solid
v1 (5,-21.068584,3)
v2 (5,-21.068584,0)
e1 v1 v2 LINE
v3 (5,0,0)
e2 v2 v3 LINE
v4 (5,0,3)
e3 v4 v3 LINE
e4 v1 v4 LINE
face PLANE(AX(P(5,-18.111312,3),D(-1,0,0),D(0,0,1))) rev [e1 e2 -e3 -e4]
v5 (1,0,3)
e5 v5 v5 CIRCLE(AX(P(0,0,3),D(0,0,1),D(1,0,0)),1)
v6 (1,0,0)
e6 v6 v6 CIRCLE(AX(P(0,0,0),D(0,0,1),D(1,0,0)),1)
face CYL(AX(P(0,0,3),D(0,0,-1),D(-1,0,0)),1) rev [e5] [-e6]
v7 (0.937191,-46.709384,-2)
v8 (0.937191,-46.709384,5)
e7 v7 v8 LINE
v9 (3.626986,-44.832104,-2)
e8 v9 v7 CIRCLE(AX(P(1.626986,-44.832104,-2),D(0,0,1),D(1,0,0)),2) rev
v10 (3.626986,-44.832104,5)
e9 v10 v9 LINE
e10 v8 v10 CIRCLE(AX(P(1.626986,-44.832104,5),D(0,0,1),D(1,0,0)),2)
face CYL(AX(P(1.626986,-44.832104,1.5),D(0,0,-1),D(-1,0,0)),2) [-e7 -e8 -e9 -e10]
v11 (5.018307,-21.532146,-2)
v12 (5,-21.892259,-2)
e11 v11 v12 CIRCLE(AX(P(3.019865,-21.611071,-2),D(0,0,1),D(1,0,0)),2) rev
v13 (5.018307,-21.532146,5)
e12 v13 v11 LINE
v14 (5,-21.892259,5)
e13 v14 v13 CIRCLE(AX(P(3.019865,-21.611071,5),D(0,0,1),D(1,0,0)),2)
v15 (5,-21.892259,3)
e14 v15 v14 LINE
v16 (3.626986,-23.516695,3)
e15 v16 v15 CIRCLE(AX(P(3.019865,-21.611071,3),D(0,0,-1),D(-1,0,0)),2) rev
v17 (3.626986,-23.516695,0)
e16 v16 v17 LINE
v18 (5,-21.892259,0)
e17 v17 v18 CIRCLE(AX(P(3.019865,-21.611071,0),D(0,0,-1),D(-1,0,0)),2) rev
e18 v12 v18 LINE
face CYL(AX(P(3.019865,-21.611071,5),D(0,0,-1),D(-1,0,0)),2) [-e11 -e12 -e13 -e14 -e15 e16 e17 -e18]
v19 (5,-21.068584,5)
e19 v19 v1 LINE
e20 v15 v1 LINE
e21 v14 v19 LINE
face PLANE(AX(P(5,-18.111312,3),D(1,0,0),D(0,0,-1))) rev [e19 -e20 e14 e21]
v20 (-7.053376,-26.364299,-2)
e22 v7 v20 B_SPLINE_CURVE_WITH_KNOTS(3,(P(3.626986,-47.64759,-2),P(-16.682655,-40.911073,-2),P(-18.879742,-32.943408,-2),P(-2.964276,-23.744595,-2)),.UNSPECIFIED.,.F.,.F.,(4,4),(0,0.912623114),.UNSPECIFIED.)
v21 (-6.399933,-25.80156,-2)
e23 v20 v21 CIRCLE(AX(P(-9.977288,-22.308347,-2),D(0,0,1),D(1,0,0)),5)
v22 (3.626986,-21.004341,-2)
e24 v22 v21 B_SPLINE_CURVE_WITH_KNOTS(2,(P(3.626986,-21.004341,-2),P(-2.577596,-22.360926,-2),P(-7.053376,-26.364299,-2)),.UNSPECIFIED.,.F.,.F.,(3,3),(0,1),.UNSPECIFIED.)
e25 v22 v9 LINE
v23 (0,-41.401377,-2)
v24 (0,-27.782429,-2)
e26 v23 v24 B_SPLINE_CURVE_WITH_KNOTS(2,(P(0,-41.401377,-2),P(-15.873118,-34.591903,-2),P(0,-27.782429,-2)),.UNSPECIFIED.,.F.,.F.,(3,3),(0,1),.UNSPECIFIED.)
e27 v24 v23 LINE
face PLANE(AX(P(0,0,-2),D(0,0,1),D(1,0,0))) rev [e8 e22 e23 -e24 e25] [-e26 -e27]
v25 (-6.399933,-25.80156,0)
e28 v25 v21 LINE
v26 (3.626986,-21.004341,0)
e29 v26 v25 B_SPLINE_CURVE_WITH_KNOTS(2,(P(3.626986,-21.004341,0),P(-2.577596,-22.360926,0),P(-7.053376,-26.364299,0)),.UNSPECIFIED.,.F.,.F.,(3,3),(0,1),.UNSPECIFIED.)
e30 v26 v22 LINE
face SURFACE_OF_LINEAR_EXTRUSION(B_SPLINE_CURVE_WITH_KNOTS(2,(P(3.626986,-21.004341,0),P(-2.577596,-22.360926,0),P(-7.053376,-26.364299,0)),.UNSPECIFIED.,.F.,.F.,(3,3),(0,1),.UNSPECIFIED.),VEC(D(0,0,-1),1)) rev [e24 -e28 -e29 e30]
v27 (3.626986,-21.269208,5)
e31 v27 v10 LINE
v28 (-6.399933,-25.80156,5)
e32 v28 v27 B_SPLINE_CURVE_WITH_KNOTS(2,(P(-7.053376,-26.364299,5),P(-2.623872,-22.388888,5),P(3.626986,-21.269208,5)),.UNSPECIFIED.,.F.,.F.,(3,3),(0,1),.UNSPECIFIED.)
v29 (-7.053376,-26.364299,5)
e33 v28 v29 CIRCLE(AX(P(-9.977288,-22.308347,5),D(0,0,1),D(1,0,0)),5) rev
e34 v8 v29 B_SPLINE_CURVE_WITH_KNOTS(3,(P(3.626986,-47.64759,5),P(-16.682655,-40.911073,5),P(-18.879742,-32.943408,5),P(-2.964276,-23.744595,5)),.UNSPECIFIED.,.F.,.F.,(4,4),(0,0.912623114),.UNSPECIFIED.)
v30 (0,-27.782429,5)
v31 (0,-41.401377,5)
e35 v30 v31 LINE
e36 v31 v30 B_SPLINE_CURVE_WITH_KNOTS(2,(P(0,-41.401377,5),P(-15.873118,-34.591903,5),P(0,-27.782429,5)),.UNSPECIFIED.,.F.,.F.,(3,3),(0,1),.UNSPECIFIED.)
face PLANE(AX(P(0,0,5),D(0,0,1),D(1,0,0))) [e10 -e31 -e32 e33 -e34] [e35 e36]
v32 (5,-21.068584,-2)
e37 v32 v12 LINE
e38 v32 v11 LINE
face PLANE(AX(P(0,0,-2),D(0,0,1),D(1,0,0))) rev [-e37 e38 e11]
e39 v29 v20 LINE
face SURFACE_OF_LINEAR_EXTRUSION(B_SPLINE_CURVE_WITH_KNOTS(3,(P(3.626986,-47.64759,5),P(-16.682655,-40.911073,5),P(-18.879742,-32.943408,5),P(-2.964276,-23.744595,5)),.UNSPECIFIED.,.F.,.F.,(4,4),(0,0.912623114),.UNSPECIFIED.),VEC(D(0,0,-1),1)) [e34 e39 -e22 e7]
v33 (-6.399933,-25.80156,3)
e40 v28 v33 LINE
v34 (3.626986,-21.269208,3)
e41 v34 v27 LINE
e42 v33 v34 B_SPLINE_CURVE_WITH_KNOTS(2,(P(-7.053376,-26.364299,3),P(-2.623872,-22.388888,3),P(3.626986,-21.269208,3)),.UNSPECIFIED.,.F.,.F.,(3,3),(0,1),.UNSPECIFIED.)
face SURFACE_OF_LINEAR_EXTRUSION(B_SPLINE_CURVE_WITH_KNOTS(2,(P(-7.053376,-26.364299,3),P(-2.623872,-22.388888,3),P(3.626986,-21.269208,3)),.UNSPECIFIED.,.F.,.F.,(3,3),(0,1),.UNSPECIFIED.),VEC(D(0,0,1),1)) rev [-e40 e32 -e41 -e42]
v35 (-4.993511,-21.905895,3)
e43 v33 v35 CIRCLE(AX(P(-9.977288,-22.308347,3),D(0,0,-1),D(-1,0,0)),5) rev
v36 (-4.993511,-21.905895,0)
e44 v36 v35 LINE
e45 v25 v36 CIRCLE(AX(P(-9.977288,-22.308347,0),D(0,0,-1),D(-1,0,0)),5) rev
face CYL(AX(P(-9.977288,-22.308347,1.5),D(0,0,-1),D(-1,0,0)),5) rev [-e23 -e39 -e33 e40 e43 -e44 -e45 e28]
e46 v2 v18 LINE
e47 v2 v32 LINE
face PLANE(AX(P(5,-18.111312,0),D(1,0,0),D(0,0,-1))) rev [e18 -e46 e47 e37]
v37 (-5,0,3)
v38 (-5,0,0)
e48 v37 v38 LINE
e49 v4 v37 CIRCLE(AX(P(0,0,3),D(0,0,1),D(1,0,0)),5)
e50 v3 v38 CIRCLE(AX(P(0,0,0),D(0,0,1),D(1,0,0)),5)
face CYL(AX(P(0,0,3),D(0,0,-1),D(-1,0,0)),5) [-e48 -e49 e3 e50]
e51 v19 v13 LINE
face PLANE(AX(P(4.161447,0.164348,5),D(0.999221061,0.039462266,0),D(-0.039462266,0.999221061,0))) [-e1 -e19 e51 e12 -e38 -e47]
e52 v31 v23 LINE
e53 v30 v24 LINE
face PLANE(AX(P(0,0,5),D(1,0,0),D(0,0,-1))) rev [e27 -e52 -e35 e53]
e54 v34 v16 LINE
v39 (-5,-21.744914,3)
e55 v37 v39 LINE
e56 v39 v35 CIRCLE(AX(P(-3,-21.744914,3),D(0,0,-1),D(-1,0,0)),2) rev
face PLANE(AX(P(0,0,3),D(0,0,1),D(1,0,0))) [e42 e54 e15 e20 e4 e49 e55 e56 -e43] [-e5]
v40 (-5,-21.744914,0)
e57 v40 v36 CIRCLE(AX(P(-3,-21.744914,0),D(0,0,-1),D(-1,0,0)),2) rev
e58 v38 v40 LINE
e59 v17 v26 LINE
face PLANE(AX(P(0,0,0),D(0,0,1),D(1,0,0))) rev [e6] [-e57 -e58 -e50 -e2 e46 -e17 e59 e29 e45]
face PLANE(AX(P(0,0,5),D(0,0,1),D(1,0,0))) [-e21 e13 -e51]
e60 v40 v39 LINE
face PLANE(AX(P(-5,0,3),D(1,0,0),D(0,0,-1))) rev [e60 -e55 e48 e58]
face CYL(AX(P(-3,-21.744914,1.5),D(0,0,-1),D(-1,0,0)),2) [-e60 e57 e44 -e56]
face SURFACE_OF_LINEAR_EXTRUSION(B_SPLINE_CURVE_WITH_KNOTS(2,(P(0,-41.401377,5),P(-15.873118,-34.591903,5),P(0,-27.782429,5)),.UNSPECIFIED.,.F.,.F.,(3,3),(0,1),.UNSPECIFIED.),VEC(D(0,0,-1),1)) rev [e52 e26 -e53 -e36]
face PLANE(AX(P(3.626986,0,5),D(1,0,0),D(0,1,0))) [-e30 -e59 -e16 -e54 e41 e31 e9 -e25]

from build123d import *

# Parameters (mm, degrees)
SKETCH_1_R           = 1
EXTRUDE_1_DEPTH      = 3
EXTRUDE_2_DEPTH      = 2
EXTRUDE_2_DEPTH_BACK = 5
FILLET_START         = -3
FILLET_3_DEPTH       = 9
FILLET_4_R           = 5
CUT_EXTRUDE_2_DEPTH  = 2
CUT_EXTRUDE_3_DEPTH  = 2


with BuildPart() as part:
    # 草图1 → 凸台-拉伸1 (new body)
    with BuildSketch(Plane.XY):
        with BuildLine():
            Line((-5, 0), (-5, -18.11131196))
            Line((-5, -18.11131196), (5, -18.11131196))
            Line((5, -18.11131196), (5, 0))
            ThreePointArc((5, 0), (0, 5), (-5, 0))
        make_face()
        Circle(SKETCH_1_R, mode=Mode.SUBTRACT)
    extrude(amount=EXTRUDE_1_DEPTH)

    # 草图2 → 凸台-拉伸2 (add, two sides: drawn at the far end of the back side and taken through both)
    with BuildSketch(Plane.XY.offset(3).offset(-EXTRUDE_2_DEPTH_BACK)):
        with BuildLine():
            Line((5, -21.0685844), (5, -18.11131196))
            Line((5, -18.11131196), (-5, -18.11131196))
            Line((-5, -18.11131196), (-5, -21.0685844))
            Line((-5, -21.0685844), (-5, -23.814982117))
            Line((-5, -23.814982117), (-2.964275547, -23.744594918))
            add(Edge.make_bspline(
                [(3.626985758, -47.647589684), (-16.682654634, -40.9110727), (-18.879741736, -32.943407778), (-2.964275547, -23.744594918)],
                knots=[0, 0, 0, 0, 0.912623114, 0.912623114, 0.912623114, 0.912623114], degree=3))
            Line((3.626985758, -47.647589684), (3.626985758, -23.516695498))
            Line((3.626985758, -23.516695498), (5.09467917, -23.465948537))
            Line((5.09467917, -23.465948537), (5, -21.0685844))
        make_face()
        with BuildLine():
            add(Edge.make_bspline(
                [(0, -41.401376639), (-15.873118036, -34.591902926), (0, -27.782429212)],
                knots=[0, 0, 0, 1, 1, 1], degree=2))
            Line((0, -27.782429212), (0, -41.401376639))
        make_face(mode=Mode.SUBTRACT)
    extrude(amount=EXTRUDE_2_DEPTH + EXTRUDE_2_DEPTH_BACK)

    # 圆角3: read off the stored shape, not the designer's step
    # 圆角3 outline → 圆角3 (cut)
    with BuildSketch(Plane.XY.offset(FILLET_START)):
        with BuildLine():
            Line((5.09467917, -23.465948537), (5.018307469, -21.532146448))
            ThreePointArc((5.018307469, -21.532146448), (4.657500154, -22.759179091), (3.626985758, -23.516695498))
            Line((3.626985758, -23.516695498), (5.09467917, -23.465948537))
        make_face()
        with BuildLine():
            Line((-5, -23.814982117), (-2.964275547, -23.744594918))
            ThreePointArc((-2.964275547, -23.744594918), (-4.401526149, -23.171702163), (-5, -21.744914003))
            Line((-5, -21.744914003), (-5, -23.814982117))
        make_face()
        with BuildLine():
            Line((3.626985758, -47.647589684), (3.626985758, -44.832103607))
            ThreePointArc((3.626985758, -44.832103607), (2.771627596, -46.472163076), (0.937190695, -46.709384292))
            add(Edge.make_bspline(
                [(3.626985758, -47.647589684), (2.692000341, -47.337463802), (1.795401987, -47.024728671), (0.937190695, -46.709384292)],
                knots=[0, 0, 0, 0, 0.042014004, 0.042014004, 0.042014004, 0.042014004], degree=3))
        make_face()
    extrude(amount=FILLET_3_DEPTH, mode=Mode.SUBTRACT)

    # 圆角4
    fillet_4_edges = [part.edges().sort_by_distance(p)[0] for p in [
        (-2.964275547, -23.744594918, 0.5),
    ]]
    fillet(fillet_4_edges, radius=FILLET_4_R)

    # 草图6 → 切除-拉伸2 (cut)
    with BuildSketch(Plane.XY.offset(5)):
        with BuildLine():
            Line((3.626985758, -21.269208488), (3.626985758, -25.801560292))
            Line((3.626985758, -25.801560292), (5, -25.801560292))
            Line((5, -25.801560292), (5, -18.11131196))
            Line((5, -18.11131196), (-5, -18.11131196))
            Line((-5, -18.11131196), (-5, -21.269208488))
            Line((-5, -21.269208488), (-7.053376084, -26.364298767))
            add(Edge.make_bspline(
                [(3.626985758, -21.269208488), (-2.623871875, -22.388888024), (-7.053376084, -26.364298767)],
                knots=[0, 0, 0, 1, 1, 1], degree=2))
        make_face()
    extrude(amount=-CUT_EXTRUDE_2_DEPTH, mode=Mode.SUBTRACT)

    # 草图7 → 切除-拉伸3 (cut)
    with BuildSketch(Plane(origin=(0, 0, -2), x_dir=(-1, 0, 0), z_dir=(0, 0, -1))):
        with BuildLine():
            Line((-3.626985758, -21.004340975), (-3.626985758, -25.801560292))
            Line((-3.626985758, -25.801560292), (-5, -25.801560292))
            Line((-5, -25.801560292), (-5, -18.11131196))
            Line((-5, -18.11131196), (7.053376084, -18.11131196))
            Line((7.053376084, -18.11131196), (7.053376084, -26.364298767))
            add(Edge.make_bspline(
                [(-3.626985758, -21.004340975), (2.577596391, -22.360926345), (7.053376084, -26.364298767)],
                knots=[0, 0, 0, 1, 1, 1], degree=2))
        make_face()
    extrude(amount=-CUT_EXTRUDE_3_DEPTH, mode=Mode.SUBTRACT)


solid = part.part
